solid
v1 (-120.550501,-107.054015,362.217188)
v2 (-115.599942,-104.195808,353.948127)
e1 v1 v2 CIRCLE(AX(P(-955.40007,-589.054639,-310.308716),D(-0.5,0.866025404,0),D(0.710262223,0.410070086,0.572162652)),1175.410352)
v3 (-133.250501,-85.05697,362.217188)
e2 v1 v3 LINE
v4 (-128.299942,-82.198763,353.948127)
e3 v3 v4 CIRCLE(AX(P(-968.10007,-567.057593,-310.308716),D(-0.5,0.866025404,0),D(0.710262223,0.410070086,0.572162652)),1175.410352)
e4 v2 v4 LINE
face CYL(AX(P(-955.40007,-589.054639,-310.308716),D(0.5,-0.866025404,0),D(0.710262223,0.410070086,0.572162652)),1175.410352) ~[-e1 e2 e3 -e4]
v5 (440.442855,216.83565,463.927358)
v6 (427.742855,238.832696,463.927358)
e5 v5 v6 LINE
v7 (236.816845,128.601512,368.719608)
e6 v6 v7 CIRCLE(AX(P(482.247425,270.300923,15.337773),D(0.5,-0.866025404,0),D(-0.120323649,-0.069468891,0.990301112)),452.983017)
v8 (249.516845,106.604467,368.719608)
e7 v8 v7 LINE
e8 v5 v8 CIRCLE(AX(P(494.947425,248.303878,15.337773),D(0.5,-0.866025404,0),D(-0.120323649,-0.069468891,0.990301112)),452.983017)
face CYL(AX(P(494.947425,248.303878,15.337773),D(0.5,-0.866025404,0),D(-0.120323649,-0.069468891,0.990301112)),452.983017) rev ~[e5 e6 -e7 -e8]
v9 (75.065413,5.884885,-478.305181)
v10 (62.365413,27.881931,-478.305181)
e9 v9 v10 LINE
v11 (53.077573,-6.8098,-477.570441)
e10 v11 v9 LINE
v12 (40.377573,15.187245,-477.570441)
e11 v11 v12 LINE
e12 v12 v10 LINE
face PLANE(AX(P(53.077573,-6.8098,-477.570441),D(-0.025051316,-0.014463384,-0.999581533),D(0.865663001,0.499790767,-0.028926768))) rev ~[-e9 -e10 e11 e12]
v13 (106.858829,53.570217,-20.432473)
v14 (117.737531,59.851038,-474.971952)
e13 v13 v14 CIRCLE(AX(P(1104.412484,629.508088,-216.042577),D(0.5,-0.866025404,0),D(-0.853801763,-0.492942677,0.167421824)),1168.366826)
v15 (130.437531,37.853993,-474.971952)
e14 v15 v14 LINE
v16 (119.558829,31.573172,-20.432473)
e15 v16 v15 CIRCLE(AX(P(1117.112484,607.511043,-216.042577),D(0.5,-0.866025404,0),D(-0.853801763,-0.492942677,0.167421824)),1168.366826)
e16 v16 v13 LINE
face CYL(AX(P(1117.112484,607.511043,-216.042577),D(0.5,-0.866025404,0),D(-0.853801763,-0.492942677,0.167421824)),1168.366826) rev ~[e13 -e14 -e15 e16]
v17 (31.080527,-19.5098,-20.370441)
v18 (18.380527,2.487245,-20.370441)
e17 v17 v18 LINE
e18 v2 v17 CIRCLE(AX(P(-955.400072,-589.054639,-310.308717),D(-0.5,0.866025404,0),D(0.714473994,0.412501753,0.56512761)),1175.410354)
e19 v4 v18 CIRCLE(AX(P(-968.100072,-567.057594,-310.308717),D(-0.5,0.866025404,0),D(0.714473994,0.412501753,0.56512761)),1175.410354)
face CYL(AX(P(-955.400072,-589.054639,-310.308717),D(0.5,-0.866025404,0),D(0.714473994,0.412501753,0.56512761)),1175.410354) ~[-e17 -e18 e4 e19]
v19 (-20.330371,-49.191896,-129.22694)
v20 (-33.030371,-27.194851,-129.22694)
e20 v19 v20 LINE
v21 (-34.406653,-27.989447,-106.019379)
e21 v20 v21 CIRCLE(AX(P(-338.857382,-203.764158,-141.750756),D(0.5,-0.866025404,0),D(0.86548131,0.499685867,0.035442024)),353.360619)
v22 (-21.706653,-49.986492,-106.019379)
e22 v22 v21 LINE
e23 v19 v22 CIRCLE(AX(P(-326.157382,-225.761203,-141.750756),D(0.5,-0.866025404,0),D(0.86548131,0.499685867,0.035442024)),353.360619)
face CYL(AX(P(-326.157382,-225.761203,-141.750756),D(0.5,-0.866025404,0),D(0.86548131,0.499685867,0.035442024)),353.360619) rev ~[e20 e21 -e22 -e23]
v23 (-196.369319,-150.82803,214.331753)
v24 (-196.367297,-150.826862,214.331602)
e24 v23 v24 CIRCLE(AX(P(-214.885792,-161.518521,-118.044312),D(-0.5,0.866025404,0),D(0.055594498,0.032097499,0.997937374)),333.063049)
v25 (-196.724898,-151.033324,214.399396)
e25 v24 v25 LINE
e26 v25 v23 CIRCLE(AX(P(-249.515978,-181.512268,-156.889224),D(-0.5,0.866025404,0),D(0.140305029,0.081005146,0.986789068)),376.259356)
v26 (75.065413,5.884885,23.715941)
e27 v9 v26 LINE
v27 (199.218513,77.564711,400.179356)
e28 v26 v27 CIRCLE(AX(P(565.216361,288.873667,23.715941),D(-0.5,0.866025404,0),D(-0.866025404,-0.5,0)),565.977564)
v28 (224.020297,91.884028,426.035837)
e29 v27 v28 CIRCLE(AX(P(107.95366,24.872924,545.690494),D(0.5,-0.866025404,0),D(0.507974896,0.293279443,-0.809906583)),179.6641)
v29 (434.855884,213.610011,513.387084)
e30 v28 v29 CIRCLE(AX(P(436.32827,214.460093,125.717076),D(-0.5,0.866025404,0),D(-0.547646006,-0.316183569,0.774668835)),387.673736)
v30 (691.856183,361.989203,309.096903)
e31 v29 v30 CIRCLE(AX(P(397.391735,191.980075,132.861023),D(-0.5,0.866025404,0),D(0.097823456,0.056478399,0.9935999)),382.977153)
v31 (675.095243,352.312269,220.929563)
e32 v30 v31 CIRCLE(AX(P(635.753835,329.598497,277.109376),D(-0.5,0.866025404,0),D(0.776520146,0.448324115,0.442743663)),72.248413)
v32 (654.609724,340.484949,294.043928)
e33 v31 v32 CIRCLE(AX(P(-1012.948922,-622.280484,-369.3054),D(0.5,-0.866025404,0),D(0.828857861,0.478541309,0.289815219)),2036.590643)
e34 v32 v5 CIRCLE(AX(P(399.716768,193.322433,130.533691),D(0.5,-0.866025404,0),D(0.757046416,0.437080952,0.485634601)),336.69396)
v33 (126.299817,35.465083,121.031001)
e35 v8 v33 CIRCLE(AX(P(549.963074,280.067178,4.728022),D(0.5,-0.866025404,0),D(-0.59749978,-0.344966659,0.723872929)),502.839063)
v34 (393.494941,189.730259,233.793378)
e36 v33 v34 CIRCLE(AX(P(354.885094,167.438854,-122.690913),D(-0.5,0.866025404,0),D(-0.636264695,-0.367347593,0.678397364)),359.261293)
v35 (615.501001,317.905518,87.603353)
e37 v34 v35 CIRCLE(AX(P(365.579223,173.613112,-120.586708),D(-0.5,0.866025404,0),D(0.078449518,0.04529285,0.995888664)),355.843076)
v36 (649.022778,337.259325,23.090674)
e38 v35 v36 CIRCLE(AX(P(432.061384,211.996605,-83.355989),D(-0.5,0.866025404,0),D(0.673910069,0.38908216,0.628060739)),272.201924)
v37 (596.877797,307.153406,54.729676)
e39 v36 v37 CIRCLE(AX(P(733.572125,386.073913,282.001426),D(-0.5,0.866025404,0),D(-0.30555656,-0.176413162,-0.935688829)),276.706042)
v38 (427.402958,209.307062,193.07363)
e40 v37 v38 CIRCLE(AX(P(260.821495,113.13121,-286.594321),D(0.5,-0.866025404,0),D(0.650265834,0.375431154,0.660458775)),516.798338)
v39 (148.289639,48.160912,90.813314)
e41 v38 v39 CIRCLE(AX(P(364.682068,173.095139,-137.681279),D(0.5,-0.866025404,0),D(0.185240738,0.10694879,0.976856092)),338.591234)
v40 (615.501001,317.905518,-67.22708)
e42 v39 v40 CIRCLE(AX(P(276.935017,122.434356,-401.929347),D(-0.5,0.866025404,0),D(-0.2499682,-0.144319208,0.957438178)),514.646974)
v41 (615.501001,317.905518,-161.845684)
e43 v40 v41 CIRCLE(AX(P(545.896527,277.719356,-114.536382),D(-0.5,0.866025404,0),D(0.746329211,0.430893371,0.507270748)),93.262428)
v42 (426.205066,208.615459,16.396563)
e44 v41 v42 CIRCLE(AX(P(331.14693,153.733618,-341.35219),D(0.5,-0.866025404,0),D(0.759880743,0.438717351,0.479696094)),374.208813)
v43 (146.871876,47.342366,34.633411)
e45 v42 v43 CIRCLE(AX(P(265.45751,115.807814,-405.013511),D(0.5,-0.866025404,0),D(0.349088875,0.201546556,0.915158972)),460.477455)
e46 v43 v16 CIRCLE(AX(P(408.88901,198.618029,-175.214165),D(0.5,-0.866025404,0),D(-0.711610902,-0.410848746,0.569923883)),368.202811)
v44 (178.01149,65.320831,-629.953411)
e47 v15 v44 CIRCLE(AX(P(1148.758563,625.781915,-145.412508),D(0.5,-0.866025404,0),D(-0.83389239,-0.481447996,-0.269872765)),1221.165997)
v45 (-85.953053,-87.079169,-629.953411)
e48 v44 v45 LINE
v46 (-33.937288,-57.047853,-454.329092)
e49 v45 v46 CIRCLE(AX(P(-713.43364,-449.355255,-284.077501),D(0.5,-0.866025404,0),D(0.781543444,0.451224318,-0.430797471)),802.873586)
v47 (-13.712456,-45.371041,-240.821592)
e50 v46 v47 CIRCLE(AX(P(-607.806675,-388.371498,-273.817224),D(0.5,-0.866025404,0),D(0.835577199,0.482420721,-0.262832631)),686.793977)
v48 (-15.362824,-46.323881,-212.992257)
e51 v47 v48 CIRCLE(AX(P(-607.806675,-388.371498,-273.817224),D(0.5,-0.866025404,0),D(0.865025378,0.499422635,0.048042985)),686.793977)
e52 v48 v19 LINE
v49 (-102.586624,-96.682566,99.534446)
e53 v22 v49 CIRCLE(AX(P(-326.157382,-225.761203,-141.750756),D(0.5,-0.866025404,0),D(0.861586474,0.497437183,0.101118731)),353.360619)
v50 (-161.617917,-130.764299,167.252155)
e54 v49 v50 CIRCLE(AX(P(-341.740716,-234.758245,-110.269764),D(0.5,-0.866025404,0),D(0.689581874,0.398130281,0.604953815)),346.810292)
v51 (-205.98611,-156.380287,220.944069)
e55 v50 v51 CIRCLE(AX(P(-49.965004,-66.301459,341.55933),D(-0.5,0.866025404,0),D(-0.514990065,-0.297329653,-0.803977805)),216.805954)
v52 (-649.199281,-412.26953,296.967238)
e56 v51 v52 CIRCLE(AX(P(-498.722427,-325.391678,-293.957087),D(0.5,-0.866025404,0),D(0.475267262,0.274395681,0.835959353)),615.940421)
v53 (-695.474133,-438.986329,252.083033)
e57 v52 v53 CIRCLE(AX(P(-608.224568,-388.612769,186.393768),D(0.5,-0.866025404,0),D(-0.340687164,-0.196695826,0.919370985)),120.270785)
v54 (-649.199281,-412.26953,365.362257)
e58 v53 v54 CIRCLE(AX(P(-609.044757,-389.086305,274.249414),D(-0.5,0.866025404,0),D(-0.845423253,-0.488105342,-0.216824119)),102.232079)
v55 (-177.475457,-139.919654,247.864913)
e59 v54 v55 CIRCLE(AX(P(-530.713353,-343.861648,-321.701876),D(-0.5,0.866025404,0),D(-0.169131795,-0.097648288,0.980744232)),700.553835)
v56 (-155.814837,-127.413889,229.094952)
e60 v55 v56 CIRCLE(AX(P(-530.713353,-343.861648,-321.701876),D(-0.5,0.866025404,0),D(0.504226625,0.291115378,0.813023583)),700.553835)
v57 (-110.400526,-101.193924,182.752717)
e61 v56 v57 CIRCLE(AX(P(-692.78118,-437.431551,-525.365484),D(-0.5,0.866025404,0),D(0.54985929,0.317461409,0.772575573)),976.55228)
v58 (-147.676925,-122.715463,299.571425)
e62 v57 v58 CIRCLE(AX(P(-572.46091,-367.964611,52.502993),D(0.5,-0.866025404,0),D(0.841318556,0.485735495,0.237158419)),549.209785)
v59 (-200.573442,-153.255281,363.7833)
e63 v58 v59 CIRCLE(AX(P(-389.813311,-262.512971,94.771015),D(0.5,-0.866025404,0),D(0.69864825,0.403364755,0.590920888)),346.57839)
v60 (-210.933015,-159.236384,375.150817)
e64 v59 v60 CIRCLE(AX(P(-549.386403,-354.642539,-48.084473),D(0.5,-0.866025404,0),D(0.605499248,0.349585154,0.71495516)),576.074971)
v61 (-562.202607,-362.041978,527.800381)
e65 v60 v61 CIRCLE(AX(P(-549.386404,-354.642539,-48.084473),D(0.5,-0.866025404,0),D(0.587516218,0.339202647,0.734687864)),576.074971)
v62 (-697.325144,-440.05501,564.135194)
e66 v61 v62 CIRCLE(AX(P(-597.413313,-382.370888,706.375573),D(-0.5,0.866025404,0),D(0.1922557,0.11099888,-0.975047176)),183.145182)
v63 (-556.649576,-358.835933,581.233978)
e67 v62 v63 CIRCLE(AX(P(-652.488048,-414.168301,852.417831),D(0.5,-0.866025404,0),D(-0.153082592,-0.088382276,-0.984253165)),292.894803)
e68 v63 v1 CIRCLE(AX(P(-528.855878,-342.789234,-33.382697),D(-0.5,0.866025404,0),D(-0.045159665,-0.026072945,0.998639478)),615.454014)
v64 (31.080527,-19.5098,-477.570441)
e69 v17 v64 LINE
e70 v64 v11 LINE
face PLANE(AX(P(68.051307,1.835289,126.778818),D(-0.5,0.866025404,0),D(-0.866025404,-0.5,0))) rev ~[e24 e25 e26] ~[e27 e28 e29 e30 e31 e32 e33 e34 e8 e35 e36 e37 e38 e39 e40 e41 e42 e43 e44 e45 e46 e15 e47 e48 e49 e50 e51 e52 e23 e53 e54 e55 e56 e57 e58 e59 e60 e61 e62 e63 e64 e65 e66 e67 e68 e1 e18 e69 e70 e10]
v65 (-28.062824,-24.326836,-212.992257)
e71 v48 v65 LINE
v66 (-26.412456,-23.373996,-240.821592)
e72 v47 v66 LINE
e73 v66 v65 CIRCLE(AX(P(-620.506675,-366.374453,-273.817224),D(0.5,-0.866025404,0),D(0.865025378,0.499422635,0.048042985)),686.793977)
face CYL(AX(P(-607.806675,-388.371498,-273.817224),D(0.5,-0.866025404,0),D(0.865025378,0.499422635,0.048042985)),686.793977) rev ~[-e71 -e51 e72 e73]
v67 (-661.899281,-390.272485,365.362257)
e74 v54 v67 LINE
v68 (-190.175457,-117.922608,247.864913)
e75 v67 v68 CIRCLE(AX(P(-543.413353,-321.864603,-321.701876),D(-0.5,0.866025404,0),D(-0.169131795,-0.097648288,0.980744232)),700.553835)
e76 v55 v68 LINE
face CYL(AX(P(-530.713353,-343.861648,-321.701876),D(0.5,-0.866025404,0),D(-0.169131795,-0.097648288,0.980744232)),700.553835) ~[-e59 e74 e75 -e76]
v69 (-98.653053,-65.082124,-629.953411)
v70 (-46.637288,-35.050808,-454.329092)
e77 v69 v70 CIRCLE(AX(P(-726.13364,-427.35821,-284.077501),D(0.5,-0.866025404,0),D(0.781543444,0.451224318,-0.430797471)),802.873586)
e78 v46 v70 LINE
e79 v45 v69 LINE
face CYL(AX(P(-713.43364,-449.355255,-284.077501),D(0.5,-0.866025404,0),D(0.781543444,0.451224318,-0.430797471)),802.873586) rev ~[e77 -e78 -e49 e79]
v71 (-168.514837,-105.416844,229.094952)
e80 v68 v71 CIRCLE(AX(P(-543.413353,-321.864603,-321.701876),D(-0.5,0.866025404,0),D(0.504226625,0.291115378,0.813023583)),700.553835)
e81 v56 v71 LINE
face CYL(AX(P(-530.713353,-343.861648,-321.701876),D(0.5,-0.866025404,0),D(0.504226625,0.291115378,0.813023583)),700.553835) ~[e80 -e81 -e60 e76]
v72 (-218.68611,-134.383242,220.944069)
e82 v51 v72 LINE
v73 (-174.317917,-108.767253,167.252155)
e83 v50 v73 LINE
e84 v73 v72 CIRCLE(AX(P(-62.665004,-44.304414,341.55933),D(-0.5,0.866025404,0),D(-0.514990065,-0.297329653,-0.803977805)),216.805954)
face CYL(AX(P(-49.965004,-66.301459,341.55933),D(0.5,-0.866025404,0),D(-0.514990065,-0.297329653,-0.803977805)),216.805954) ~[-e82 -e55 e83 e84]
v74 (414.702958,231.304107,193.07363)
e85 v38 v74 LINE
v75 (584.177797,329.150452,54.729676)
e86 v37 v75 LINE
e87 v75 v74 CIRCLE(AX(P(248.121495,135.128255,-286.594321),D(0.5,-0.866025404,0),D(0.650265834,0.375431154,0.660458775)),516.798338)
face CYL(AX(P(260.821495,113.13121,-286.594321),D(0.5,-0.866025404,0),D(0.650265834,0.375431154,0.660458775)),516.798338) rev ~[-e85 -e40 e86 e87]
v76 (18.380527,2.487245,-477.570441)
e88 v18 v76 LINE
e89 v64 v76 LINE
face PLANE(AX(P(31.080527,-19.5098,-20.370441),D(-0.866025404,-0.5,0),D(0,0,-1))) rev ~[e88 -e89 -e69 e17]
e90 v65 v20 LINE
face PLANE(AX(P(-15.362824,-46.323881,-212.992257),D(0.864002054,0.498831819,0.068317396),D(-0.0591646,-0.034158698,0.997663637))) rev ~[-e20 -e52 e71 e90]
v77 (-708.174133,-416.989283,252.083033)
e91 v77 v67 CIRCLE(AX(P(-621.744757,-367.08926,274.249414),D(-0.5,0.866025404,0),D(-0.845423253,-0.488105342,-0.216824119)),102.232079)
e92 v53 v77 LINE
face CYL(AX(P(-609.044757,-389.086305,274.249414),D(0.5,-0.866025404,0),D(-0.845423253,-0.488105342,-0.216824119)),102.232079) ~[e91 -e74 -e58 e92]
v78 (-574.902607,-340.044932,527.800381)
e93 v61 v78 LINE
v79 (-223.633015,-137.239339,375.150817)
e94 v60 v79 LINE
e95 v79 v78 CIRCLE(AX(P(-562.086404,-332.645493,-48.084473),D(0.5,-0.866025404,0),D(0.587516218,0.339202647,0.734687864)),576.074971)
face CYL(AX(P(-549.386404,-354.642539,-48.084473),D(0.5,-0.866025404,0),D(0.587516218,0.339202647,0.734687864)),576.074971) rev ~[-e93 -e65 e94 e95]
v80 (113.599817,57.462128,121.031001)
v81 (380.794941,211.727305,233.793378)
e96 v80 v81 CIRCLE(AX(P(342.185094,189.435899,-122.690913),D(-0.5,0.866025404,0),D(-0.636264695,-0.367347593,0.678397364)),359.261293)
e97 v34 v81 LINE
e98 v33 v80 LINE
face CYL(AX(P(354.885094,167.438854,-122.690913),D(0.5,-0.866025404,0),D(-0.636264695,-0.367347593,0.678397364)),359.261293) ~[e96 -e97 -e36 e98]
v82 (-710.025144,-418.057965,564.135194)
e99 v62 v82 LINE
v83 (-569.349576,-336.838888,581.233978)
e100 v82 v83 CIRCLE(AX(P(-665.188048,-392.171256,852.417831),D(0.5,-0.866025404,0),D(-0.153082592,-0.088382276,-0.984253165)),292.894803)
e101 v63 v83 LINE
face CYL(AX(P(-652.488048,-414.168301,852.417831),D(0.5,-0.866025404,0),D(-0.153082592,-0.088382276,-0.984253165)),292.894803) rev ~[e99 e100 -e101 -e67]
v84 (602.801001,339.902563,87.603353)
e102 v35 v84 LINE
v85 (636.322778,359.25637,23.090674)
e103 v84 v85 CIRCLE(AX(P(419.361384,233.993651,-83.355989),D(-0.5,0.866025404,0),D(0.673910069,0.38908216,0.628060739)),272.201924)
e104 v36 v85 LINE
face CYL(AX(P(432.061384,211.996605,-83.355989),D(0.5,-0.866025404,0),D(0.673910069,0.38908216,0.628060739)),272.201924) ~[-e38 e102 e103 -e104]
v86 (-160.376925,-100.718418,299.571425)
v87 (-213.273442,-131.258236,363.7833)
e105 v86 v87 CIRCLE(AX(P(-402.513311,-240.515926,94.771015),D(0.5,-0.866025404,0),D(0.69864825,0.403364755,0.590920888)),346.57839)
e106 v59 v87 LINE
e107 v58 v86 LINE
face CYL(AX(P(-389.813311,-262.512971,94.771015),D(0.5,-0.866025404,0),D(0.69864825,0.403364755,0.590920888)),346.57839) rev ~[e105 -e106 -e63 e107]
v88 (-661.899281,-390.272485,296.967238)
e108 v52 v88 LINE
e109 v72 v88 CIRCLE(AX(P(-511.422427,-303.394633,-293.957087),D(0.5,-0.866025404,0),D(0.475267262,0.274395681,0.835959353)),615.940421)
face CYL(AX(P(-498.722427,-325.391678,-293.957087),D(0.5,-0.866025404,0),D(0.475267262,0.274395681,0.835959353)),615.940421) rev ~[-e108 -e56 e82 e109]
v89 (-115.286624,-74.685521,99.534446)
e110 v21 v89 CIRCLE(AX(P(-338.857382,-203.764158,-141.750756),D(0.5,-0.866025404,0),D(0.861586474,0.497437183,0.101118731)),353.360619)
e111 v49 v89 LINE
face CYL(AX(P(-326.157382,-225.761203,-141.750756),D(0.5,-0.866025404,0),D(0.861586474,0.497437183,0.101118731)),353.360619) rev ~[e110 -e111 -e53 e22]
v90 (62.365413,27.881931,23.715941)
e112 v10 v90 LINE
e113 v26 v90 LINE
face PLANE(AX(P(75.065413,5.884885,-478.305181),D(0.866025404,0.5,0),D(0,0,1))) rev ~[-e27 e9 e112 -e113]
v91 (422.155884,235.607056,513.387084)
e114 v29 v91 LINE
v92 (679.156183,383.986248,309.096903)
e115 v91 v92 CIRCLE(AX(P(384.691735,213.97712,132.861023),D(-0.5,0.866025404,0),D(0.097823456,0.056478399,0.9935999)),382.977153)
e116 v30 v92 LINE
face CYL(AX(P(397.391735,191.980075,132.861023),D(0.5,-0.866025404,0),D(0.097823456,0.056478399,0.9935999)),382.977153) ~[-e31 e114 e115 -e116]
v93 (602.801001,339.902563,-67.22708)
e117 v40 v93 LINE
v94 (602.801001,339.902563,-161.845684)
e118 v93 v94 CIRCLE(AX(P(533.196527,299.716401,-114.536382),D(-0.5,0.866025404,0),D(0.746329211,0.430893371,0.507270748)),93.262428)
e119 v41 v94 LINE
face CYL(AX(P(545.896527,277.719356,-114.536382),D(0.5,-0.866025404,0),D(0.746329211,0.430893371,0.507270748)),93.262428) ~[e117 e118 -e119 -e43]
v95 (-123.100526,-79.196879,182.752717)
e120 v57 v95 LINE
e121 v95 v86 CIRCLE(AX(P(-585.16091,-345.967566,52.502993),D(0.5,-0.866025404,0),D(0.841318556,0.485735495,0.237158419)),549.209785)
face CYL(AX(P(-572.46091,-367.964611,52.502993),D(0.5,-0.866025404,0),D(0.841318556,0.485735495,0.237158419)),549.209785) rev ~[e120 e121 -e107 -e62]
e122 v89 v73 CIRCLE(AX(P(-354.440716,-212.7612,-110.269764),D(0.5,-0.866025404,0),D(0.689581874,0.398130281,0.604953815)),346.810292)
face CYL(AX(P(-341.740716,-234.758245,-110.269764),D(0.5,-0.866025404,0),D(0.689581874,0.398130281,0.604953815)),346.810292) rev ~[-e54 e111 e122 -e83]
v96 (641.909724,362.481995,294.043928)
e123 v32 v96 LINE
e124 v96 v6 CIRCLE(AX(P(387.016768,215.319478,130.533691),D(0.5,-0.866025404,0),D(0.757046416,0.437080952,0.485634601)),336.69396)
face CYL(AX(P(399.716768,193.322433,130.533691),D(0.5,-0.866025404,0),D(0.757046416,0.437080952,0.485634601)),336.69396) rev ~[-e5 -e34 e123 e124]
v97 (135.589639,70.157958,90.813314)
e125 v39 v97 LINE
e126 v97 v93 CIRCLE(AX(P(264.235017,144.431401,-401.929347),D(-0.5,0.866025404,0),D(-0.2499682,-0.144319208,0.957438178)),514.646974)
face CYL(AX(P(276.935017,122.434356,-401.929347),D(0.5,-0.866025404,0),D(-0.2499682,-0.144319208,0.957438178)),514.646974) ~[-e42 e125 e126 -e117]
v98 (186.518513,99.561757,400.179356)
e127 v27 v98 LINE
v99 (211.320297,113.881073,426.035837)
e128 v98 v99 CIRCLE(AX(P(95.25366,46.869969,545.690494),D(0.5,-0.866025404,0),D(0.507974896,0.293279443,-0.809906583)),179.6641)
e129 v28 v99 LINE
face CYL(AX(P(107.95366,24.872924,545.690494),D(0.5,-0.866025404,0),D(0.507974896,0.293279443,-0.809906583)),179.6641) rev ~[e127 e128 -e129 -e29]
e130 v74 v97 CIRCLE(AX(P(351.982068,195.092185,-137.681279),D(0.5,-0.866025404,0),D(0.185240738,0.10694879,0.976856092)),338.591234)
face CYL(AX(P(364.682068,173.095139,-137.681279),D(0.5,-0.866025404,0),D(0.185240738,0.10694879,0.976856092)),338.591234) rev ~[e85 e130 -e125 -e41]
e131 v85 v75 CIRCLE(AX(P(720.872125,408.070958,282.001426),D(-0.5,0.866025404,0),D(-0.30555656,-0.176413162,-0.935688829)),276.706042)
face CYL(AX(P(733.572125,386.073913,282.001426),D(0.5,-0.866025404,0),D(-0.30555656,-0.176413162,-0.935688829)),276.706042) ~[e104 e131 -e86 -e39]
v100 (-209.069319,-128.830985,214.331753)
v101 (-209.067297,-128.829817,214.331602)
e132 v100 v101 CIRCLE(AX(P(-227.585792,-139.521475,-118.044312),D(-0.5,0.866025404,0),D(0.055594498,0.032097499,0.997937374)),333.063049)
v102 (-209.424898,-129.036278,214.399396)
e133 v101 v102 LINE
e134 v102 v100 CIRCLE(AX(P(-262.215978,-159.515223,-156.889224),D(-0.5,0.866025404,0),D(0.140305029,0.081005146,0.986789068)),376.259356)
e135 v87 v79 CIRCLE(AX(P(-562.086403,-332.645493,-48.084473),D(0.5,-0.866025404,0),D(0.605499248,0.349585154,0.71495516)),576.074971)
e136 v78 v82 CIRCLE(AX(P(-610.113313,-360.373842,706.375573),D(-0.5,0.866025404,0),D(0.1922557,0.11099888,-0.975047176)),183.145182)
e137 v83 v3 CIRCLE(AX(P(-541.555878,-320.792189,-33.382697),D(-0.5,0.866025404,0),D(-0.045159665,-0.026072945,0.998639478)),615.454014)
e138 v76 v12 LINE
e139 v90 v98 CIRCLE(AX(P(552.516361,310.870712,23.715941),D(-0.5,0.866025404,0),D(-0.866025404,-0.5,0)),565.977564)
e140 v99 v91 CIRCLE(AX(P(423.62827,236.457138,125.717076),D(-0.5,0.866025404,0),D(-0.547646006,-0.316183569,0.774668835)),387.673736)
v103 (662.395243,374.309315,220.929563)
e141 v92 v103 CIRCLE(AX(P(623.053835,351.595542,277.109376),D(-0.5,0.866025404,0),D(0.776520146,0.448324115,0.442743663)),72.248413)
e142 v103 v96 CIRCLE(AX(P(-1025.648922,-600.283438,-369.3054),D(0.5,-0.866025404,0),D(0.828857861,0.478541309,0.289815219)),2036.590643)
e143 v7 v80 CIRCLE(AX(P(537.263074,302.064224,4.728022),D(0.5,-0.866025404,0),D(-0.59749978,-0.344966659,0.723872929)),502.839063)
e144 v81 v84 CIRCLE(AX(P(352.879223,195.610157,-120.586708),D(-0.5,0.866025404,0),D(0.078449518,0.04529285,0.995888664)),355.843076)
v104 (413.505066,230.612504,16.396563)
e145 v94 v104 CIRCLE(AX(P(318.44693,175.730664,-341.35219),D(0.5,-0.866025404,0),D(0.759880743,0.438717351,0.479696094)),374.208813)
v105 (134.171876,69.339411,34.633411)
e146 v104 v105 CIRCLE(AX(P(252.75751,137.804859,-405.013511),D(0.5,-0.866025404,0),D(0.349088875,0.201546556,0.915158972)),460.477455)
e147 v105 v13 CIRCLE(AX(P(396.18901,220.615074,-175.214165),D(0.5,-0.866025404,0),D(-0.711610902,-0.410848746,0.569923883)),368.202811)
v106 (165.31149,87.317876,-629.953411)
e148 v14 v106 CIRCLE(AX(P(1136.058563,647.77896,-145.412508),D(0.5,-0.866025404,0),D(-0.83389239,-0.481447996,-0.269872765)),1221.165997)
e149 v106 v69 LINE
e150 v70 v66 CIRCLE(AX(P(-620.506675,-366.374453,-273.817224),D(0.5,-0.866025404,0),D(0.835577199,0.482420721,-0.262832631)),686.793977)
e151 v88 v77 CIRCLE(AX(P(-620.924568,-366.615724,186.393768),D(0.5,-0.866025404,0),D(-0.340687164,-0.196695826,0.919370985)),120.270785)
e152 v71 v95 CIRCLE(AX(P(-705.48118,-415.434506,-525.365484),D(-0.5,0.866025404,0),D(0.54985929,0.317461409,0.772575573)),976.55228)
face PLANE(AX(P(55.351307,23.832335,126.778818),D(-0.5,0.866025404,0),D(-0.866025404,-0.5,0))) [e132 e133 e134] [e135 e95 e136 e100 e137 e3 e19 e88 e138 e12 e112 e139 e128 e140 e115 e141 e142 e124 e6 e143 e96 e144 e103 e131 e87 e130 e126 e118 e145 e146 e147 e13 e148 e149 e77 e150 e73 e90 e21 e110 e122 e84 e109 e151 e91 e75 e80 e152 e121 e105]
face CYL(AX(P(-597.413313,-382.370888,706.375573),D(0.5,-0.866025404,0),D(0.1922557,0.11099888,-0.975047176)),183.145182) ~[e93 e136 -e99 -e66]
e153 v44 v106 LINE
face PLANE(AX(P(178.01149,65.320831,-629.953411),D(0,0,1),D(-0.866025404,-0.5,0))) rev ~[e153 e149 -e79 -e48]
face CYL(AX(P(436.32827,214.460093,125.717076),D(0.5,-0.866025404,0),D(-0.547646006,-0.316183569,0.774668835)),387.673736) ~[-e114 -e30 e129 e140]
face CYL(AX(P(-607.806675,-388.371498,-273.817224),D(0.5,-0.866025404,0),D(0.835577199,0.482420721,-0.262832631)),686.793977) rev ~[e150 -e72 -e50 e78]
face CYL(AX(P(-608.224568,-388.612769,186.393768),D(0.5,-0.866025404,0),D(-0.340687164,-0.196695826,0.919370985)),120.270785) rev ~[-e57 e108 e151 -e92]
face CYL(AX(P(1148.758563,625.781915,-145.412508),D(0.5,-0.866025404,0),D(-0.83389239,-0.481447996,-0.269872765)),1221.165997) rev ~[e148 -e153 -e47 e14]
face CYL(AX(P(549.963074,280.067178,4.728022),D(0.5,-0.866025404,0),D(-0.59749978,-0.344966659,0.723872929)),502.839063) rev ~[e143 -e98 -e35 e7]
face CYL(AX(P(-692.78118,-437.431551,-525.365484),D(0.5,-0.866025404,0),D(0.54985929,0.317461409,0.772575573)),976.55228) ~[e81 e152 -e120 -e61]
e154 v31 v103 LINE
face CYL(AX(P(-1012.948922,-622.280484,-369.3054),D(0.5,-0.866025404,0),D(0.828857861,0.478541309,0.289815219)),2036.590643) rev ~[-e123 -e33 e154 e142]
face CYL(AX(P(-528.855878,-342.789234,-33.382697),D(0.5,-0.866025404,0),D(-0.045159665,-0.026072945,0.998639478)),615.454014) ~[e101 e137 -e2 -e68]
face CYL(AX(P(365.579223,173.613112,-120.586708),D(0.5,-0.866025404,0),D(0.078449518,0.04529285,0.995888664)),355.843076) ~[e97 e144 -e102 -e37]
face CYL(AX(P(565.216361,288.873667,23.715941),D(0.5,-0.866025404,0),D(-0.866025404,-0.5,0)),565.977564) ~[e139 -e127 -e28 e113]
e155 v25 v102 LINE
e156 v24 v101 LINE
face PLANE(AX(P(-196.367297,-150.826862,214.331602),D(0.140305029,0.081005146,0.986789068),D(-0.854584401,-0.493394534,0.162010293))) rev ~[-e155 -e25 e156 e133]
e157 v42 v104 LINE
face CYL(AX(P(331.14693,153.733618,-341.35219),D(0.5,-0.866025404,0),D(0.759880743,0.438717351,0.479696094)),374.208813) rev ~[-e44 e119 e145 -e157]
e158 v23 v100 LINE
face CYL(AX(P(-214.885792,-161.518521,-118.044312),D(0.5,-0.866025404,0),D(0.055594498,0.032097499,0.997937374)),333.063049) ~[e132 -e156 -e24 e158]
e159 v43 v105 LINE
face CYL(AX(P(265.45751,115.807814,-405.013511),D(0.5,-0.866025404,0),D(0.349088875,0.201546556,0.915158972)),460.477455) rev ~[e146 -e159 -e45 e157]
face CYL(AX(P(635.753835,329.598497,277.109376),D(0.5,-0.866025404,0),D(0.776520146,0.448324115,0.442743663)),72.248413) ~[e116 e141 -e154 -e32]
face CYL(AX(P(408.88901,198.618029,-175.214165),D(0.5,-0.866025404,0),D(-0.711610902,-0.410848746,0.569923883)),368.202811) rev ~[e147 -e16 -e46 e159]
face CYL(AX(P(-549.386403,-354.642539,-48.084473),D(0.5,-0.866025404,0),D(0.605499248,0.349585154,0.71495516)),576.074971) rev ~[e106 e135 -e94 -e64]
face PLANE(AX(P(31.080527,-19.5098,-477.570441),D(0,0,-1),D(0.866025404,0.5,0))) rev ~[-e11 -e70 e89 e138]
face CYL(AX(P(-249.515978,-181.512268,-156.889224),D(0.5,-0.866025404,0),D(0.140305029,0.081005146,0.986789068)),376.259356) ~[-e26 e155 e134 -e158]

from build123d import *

# Parameters (mm, degrees)
F1_DEPTH = 25.4
F2_ANGLE = 240
F3_ANGLE = 30


# Not quite as in the source:
# - a feature names something its author has since deleted; it is built from what else it names


with BuildPart() as f1:
    # F0 (on Front) → F1 (new body)
    with BuildSketch(Plane.XZ):
        with BuildLine():
            ThreePointArc((250.1826790571, 167.252155113), (278.1130880831, 191.8897284489), (301.4146556953, 220.9440691755))
            ThreePointArc((301.4146556953, 220.9440691755), (548.9344062192, 315.2980350064), (813.1931424143, 296.9672381879))
            ThreePointArc((813.1931424143, 296.9672381879), (843.2368199295, 278.4857074323), (866.6267395021, 252.0830333234))
            ThreePointArc((866.6267395021, 252.0830333234), (859.2886133314, 317.8635284318), (813.1931424141, 365.3622567654))
            ThreePointArc((813.1931424141, 365.3622567654), (528.658381188, 363.1008503302), (268.4933890423, 247.8649133709))
            ThreePointArc((268.4933890423, 247.8649133709), (255.8828799715, 238.6195077853), (243.4818595648, 229.0949523449))
            ThreePointArc((243.4818595648, 229.0949523449), (216.8466348082, 206.3937348312), (191.0419305212, 182.7527172748))
            ThreePointArc((191.0419305212, 182.7527172748), (209.2426753746, 242.3856524278), (234.085008502, 299.5714247227))
            ThreePointArc((234.085008502, 299.5714247227), (262.5639500876, 333.6377098113), (295.1646447182, 363.7832999229))
            ThreePointArc((295.1646447182, 363.7832999229), (301.1050415282, 369.5098935095), (307.1268496022, 375.1508168282))
            ThreePointArc((307.1268496022, 375.1508168282), (495.0303186662, 491.0726231916), (712.7380371094, 527.8003811836))
            ThreePointArc((712.7380371094, 527.8003811836), (794.9345928524, 528.0032351591), (868.764102459, 564.1351938248))
            ThreePointArc((868.764102459, 564.1351938248), (786.3289991041, 561.1323579191), (706.3259482384, 581.2339782715))
            ThreePointArc((706.3259482384, 581.2339782715), (428.7633374116, 531.0006025963), (202.7621120214, 362.2171878815))
            ThreePointArc((202.7621120214, 362.2171878815), (199.8950650536, 358.0887688295), (197.0456982791, 353.9481274337))
            ThreePointArc((197.0456982791, 353.9481274337), (95.8778868485, 174.2465451031), (27.6736820157, -20.3704408073))
            Line((27.6736820157, -20.3704408073), (27.6736820157, -477.5704408073))
            Line((27.6736820157, -477.5704408073), (2.2736820157, -477.5704408073))
            Line((2.2736820157, -477.5704408073), (-23.1156889348, -478.3051807189))
            Line((-23.1156889348, -478.3051807189), (-23.1156889348, -20.3704408073))
            Line((-23.1156889348, -20.3704408073), (-23.1156889348, 23.7159409966))
            ThreePointArc((-23.1156889348, 23.7159409966), (-60.1684665025, 225.1338478784), (-166.475340724, 400.1793563366))
            ThreePointArc((-166.475340724, 400.1793563366), (-181.4907758471, 412.3365760313), (-195.1139737362, 426.0358373953))
            ThreePointArc((-195.1139737362, 426.0358373953), (-309.3402704075, 490.6134334), (-438.5659396648, 513.3870840073))
            ThreePointArc((-438.5659396648, 513.3870840073), (-612.4676441027, 448.3168030455), (-735.3243231773, 309.0969026089))
            ThreePointArc((-735.3243231773, 309.0969026089), (-741.1111301221, 261.6187426822), (-715.9704566002, 220.9295630455))
            ThreePointArc((-715.9704566002, 220.9295630455), (-704.4880158315, 257.5983242076), (-692.3158168793, 294.0439283848))
            ThreePointArc((-692.3158168793, 294.0439283848), (-588.6352200974, 408.0539998704), (-445.0172185898, 463.9273583889))
            ThreePointArc((-445.0172185898, 463.9273583889), (-328.3620257934, 431.1988717022), (-224.5548516512, 368.7196075916))
            ThreePointArc((-224.5548516512, 368.7196075916), (-135.4578046593, 255.1906523593), (-82.276083529, 121.0310012102))
            ThreePointArc((-82.276083529, 121.0310012102), (-222.8986090653, 214.7399937609), (-390.8064365387, 233.7933778763))
            ThreePointArc((-390.8064365387, 233.7933778763), (-534.8506307826, 188.5252288055), (-647.1569538116, 87.6033529639))
            ThreePointArc((-647.1569538116, 87.6033529639), (-668.750342933, 56.6907627964), (-685.8645677567, 23.0906736106))
            ThreePointArc((-685.8645677567, 23.0906736106), (-654.782784529, 37.0530177531), (-625.6527304649, 54.7296761702))
            ThreePointArc((-625.6527304649, 54.7296761702), (-535.9364621749, 135.4019490396), (-429.9600422382, 193.0736303329))
            ThreePointArc((-429.9600422382, 193.0736303329), (-255.1353162114, 185.0540353391), (-107.6677426965, 90.8133143325))
            ThreePointArc((-107.6677426965, 90.8133143325), (-400.8973120765, 91.9617638291), (-647.1569538116, -67.2270804644))
            ThreePointArc((-647.1569538116, -67.2270804644), (-660.0470579155, -114.5363822579), (-647.1569538116, -161.8456840515))
            ThreePointArc((-647.1569538116, -161.8456840515), (-555.302299834, -51.3433620353), (-428.5768360003, 16.3965630051))
            ThreePointArc((-428.5768360003, 16.3965630051), (-268.955549485, 54.7296761702), (-106.0306501957, 34.633411211))
            ThreePointArc((-106.0306501957, 34.633411211), (-89.072951708, 7.7811719553), (-74.492260997, -20.4324727833))
            ThreePointArc((-74.492260997, -20.4324727833), (-58.44709094, -248.3192131796), (-87.0539037033, -474.9719523956))
            ThreePointArc((-87.0539037033, -474.9719523956), (-111.9092602944, -553.3883298655), (-141.9875799101, -629.9534113053))
            Line((-141.9875799101, -629.9534113053), (162.8124200899, -629.9534113053))
            ThreePointArc((162.8124200899, -629.9534113053), (127.6888612329, -543.8827728043), (102.7497877256, -454.3290916329))
            ThreePointArc((102.7497877256, -454.3290916329), (82.6750571268, -348.4939128162), (79.3961640974, -240.8215916548))
            ThreePointArc((79.3961640974, -240.8215916548), (80.2077016296, -226.8972481017), (81.3018441543, -212.9922565991))
            Line((81.3018441543, -212.9922565991), (87.0378738701, -129.2269402374))
            ThreePointArc((87.0378738701, -129.2269402374), (87.6414479673, -117.6100786674), (88.6270669795, -106.0193785337))
            ThreePointArc((88.6270669795, -106.0193785337), (118.4644160965, 4.4171939804), (182.0192138426, 99.534446014))
            ThreePointArc((182.0192138426, 99.534446014), (213.7444570986, 135.7653016553), (250.1826790571, 167.252155113))
        make_face()
        with BuildLine():
            ThreePointArc((290.310142009, 214.3317525479), (290.308974312, 214.3316774306), (290.3078066153, 214.3316023092))
            Line((290.3078066153, 214.3316023092), (290.7207294437, 214.3993956711))
            ThreePointArc((290.7207294437, 214.3993956711), (290.5154263752, 214.3656308704), (290.310142009, 214.3317525479))
        make_face(mode=Mode.SUBTRACT)
    extrude(amount=F1_DEPTH)


with BuildPart() as f1_1:
    # F2: moved
    add(f1.part.rotate(Axis((27.6736820157, -25.4, -248.9704408073), (0, 0, 1)), F2_ANGLE))


with BuildPart() as f1_2:
    # F3: moved
    add(f1_1.part.rotate(Axis((75.0654127471, 5.8848854854, -227.2946198611), (0, 0, -1)), F3_ANGLE))


solid = f1_2.part
